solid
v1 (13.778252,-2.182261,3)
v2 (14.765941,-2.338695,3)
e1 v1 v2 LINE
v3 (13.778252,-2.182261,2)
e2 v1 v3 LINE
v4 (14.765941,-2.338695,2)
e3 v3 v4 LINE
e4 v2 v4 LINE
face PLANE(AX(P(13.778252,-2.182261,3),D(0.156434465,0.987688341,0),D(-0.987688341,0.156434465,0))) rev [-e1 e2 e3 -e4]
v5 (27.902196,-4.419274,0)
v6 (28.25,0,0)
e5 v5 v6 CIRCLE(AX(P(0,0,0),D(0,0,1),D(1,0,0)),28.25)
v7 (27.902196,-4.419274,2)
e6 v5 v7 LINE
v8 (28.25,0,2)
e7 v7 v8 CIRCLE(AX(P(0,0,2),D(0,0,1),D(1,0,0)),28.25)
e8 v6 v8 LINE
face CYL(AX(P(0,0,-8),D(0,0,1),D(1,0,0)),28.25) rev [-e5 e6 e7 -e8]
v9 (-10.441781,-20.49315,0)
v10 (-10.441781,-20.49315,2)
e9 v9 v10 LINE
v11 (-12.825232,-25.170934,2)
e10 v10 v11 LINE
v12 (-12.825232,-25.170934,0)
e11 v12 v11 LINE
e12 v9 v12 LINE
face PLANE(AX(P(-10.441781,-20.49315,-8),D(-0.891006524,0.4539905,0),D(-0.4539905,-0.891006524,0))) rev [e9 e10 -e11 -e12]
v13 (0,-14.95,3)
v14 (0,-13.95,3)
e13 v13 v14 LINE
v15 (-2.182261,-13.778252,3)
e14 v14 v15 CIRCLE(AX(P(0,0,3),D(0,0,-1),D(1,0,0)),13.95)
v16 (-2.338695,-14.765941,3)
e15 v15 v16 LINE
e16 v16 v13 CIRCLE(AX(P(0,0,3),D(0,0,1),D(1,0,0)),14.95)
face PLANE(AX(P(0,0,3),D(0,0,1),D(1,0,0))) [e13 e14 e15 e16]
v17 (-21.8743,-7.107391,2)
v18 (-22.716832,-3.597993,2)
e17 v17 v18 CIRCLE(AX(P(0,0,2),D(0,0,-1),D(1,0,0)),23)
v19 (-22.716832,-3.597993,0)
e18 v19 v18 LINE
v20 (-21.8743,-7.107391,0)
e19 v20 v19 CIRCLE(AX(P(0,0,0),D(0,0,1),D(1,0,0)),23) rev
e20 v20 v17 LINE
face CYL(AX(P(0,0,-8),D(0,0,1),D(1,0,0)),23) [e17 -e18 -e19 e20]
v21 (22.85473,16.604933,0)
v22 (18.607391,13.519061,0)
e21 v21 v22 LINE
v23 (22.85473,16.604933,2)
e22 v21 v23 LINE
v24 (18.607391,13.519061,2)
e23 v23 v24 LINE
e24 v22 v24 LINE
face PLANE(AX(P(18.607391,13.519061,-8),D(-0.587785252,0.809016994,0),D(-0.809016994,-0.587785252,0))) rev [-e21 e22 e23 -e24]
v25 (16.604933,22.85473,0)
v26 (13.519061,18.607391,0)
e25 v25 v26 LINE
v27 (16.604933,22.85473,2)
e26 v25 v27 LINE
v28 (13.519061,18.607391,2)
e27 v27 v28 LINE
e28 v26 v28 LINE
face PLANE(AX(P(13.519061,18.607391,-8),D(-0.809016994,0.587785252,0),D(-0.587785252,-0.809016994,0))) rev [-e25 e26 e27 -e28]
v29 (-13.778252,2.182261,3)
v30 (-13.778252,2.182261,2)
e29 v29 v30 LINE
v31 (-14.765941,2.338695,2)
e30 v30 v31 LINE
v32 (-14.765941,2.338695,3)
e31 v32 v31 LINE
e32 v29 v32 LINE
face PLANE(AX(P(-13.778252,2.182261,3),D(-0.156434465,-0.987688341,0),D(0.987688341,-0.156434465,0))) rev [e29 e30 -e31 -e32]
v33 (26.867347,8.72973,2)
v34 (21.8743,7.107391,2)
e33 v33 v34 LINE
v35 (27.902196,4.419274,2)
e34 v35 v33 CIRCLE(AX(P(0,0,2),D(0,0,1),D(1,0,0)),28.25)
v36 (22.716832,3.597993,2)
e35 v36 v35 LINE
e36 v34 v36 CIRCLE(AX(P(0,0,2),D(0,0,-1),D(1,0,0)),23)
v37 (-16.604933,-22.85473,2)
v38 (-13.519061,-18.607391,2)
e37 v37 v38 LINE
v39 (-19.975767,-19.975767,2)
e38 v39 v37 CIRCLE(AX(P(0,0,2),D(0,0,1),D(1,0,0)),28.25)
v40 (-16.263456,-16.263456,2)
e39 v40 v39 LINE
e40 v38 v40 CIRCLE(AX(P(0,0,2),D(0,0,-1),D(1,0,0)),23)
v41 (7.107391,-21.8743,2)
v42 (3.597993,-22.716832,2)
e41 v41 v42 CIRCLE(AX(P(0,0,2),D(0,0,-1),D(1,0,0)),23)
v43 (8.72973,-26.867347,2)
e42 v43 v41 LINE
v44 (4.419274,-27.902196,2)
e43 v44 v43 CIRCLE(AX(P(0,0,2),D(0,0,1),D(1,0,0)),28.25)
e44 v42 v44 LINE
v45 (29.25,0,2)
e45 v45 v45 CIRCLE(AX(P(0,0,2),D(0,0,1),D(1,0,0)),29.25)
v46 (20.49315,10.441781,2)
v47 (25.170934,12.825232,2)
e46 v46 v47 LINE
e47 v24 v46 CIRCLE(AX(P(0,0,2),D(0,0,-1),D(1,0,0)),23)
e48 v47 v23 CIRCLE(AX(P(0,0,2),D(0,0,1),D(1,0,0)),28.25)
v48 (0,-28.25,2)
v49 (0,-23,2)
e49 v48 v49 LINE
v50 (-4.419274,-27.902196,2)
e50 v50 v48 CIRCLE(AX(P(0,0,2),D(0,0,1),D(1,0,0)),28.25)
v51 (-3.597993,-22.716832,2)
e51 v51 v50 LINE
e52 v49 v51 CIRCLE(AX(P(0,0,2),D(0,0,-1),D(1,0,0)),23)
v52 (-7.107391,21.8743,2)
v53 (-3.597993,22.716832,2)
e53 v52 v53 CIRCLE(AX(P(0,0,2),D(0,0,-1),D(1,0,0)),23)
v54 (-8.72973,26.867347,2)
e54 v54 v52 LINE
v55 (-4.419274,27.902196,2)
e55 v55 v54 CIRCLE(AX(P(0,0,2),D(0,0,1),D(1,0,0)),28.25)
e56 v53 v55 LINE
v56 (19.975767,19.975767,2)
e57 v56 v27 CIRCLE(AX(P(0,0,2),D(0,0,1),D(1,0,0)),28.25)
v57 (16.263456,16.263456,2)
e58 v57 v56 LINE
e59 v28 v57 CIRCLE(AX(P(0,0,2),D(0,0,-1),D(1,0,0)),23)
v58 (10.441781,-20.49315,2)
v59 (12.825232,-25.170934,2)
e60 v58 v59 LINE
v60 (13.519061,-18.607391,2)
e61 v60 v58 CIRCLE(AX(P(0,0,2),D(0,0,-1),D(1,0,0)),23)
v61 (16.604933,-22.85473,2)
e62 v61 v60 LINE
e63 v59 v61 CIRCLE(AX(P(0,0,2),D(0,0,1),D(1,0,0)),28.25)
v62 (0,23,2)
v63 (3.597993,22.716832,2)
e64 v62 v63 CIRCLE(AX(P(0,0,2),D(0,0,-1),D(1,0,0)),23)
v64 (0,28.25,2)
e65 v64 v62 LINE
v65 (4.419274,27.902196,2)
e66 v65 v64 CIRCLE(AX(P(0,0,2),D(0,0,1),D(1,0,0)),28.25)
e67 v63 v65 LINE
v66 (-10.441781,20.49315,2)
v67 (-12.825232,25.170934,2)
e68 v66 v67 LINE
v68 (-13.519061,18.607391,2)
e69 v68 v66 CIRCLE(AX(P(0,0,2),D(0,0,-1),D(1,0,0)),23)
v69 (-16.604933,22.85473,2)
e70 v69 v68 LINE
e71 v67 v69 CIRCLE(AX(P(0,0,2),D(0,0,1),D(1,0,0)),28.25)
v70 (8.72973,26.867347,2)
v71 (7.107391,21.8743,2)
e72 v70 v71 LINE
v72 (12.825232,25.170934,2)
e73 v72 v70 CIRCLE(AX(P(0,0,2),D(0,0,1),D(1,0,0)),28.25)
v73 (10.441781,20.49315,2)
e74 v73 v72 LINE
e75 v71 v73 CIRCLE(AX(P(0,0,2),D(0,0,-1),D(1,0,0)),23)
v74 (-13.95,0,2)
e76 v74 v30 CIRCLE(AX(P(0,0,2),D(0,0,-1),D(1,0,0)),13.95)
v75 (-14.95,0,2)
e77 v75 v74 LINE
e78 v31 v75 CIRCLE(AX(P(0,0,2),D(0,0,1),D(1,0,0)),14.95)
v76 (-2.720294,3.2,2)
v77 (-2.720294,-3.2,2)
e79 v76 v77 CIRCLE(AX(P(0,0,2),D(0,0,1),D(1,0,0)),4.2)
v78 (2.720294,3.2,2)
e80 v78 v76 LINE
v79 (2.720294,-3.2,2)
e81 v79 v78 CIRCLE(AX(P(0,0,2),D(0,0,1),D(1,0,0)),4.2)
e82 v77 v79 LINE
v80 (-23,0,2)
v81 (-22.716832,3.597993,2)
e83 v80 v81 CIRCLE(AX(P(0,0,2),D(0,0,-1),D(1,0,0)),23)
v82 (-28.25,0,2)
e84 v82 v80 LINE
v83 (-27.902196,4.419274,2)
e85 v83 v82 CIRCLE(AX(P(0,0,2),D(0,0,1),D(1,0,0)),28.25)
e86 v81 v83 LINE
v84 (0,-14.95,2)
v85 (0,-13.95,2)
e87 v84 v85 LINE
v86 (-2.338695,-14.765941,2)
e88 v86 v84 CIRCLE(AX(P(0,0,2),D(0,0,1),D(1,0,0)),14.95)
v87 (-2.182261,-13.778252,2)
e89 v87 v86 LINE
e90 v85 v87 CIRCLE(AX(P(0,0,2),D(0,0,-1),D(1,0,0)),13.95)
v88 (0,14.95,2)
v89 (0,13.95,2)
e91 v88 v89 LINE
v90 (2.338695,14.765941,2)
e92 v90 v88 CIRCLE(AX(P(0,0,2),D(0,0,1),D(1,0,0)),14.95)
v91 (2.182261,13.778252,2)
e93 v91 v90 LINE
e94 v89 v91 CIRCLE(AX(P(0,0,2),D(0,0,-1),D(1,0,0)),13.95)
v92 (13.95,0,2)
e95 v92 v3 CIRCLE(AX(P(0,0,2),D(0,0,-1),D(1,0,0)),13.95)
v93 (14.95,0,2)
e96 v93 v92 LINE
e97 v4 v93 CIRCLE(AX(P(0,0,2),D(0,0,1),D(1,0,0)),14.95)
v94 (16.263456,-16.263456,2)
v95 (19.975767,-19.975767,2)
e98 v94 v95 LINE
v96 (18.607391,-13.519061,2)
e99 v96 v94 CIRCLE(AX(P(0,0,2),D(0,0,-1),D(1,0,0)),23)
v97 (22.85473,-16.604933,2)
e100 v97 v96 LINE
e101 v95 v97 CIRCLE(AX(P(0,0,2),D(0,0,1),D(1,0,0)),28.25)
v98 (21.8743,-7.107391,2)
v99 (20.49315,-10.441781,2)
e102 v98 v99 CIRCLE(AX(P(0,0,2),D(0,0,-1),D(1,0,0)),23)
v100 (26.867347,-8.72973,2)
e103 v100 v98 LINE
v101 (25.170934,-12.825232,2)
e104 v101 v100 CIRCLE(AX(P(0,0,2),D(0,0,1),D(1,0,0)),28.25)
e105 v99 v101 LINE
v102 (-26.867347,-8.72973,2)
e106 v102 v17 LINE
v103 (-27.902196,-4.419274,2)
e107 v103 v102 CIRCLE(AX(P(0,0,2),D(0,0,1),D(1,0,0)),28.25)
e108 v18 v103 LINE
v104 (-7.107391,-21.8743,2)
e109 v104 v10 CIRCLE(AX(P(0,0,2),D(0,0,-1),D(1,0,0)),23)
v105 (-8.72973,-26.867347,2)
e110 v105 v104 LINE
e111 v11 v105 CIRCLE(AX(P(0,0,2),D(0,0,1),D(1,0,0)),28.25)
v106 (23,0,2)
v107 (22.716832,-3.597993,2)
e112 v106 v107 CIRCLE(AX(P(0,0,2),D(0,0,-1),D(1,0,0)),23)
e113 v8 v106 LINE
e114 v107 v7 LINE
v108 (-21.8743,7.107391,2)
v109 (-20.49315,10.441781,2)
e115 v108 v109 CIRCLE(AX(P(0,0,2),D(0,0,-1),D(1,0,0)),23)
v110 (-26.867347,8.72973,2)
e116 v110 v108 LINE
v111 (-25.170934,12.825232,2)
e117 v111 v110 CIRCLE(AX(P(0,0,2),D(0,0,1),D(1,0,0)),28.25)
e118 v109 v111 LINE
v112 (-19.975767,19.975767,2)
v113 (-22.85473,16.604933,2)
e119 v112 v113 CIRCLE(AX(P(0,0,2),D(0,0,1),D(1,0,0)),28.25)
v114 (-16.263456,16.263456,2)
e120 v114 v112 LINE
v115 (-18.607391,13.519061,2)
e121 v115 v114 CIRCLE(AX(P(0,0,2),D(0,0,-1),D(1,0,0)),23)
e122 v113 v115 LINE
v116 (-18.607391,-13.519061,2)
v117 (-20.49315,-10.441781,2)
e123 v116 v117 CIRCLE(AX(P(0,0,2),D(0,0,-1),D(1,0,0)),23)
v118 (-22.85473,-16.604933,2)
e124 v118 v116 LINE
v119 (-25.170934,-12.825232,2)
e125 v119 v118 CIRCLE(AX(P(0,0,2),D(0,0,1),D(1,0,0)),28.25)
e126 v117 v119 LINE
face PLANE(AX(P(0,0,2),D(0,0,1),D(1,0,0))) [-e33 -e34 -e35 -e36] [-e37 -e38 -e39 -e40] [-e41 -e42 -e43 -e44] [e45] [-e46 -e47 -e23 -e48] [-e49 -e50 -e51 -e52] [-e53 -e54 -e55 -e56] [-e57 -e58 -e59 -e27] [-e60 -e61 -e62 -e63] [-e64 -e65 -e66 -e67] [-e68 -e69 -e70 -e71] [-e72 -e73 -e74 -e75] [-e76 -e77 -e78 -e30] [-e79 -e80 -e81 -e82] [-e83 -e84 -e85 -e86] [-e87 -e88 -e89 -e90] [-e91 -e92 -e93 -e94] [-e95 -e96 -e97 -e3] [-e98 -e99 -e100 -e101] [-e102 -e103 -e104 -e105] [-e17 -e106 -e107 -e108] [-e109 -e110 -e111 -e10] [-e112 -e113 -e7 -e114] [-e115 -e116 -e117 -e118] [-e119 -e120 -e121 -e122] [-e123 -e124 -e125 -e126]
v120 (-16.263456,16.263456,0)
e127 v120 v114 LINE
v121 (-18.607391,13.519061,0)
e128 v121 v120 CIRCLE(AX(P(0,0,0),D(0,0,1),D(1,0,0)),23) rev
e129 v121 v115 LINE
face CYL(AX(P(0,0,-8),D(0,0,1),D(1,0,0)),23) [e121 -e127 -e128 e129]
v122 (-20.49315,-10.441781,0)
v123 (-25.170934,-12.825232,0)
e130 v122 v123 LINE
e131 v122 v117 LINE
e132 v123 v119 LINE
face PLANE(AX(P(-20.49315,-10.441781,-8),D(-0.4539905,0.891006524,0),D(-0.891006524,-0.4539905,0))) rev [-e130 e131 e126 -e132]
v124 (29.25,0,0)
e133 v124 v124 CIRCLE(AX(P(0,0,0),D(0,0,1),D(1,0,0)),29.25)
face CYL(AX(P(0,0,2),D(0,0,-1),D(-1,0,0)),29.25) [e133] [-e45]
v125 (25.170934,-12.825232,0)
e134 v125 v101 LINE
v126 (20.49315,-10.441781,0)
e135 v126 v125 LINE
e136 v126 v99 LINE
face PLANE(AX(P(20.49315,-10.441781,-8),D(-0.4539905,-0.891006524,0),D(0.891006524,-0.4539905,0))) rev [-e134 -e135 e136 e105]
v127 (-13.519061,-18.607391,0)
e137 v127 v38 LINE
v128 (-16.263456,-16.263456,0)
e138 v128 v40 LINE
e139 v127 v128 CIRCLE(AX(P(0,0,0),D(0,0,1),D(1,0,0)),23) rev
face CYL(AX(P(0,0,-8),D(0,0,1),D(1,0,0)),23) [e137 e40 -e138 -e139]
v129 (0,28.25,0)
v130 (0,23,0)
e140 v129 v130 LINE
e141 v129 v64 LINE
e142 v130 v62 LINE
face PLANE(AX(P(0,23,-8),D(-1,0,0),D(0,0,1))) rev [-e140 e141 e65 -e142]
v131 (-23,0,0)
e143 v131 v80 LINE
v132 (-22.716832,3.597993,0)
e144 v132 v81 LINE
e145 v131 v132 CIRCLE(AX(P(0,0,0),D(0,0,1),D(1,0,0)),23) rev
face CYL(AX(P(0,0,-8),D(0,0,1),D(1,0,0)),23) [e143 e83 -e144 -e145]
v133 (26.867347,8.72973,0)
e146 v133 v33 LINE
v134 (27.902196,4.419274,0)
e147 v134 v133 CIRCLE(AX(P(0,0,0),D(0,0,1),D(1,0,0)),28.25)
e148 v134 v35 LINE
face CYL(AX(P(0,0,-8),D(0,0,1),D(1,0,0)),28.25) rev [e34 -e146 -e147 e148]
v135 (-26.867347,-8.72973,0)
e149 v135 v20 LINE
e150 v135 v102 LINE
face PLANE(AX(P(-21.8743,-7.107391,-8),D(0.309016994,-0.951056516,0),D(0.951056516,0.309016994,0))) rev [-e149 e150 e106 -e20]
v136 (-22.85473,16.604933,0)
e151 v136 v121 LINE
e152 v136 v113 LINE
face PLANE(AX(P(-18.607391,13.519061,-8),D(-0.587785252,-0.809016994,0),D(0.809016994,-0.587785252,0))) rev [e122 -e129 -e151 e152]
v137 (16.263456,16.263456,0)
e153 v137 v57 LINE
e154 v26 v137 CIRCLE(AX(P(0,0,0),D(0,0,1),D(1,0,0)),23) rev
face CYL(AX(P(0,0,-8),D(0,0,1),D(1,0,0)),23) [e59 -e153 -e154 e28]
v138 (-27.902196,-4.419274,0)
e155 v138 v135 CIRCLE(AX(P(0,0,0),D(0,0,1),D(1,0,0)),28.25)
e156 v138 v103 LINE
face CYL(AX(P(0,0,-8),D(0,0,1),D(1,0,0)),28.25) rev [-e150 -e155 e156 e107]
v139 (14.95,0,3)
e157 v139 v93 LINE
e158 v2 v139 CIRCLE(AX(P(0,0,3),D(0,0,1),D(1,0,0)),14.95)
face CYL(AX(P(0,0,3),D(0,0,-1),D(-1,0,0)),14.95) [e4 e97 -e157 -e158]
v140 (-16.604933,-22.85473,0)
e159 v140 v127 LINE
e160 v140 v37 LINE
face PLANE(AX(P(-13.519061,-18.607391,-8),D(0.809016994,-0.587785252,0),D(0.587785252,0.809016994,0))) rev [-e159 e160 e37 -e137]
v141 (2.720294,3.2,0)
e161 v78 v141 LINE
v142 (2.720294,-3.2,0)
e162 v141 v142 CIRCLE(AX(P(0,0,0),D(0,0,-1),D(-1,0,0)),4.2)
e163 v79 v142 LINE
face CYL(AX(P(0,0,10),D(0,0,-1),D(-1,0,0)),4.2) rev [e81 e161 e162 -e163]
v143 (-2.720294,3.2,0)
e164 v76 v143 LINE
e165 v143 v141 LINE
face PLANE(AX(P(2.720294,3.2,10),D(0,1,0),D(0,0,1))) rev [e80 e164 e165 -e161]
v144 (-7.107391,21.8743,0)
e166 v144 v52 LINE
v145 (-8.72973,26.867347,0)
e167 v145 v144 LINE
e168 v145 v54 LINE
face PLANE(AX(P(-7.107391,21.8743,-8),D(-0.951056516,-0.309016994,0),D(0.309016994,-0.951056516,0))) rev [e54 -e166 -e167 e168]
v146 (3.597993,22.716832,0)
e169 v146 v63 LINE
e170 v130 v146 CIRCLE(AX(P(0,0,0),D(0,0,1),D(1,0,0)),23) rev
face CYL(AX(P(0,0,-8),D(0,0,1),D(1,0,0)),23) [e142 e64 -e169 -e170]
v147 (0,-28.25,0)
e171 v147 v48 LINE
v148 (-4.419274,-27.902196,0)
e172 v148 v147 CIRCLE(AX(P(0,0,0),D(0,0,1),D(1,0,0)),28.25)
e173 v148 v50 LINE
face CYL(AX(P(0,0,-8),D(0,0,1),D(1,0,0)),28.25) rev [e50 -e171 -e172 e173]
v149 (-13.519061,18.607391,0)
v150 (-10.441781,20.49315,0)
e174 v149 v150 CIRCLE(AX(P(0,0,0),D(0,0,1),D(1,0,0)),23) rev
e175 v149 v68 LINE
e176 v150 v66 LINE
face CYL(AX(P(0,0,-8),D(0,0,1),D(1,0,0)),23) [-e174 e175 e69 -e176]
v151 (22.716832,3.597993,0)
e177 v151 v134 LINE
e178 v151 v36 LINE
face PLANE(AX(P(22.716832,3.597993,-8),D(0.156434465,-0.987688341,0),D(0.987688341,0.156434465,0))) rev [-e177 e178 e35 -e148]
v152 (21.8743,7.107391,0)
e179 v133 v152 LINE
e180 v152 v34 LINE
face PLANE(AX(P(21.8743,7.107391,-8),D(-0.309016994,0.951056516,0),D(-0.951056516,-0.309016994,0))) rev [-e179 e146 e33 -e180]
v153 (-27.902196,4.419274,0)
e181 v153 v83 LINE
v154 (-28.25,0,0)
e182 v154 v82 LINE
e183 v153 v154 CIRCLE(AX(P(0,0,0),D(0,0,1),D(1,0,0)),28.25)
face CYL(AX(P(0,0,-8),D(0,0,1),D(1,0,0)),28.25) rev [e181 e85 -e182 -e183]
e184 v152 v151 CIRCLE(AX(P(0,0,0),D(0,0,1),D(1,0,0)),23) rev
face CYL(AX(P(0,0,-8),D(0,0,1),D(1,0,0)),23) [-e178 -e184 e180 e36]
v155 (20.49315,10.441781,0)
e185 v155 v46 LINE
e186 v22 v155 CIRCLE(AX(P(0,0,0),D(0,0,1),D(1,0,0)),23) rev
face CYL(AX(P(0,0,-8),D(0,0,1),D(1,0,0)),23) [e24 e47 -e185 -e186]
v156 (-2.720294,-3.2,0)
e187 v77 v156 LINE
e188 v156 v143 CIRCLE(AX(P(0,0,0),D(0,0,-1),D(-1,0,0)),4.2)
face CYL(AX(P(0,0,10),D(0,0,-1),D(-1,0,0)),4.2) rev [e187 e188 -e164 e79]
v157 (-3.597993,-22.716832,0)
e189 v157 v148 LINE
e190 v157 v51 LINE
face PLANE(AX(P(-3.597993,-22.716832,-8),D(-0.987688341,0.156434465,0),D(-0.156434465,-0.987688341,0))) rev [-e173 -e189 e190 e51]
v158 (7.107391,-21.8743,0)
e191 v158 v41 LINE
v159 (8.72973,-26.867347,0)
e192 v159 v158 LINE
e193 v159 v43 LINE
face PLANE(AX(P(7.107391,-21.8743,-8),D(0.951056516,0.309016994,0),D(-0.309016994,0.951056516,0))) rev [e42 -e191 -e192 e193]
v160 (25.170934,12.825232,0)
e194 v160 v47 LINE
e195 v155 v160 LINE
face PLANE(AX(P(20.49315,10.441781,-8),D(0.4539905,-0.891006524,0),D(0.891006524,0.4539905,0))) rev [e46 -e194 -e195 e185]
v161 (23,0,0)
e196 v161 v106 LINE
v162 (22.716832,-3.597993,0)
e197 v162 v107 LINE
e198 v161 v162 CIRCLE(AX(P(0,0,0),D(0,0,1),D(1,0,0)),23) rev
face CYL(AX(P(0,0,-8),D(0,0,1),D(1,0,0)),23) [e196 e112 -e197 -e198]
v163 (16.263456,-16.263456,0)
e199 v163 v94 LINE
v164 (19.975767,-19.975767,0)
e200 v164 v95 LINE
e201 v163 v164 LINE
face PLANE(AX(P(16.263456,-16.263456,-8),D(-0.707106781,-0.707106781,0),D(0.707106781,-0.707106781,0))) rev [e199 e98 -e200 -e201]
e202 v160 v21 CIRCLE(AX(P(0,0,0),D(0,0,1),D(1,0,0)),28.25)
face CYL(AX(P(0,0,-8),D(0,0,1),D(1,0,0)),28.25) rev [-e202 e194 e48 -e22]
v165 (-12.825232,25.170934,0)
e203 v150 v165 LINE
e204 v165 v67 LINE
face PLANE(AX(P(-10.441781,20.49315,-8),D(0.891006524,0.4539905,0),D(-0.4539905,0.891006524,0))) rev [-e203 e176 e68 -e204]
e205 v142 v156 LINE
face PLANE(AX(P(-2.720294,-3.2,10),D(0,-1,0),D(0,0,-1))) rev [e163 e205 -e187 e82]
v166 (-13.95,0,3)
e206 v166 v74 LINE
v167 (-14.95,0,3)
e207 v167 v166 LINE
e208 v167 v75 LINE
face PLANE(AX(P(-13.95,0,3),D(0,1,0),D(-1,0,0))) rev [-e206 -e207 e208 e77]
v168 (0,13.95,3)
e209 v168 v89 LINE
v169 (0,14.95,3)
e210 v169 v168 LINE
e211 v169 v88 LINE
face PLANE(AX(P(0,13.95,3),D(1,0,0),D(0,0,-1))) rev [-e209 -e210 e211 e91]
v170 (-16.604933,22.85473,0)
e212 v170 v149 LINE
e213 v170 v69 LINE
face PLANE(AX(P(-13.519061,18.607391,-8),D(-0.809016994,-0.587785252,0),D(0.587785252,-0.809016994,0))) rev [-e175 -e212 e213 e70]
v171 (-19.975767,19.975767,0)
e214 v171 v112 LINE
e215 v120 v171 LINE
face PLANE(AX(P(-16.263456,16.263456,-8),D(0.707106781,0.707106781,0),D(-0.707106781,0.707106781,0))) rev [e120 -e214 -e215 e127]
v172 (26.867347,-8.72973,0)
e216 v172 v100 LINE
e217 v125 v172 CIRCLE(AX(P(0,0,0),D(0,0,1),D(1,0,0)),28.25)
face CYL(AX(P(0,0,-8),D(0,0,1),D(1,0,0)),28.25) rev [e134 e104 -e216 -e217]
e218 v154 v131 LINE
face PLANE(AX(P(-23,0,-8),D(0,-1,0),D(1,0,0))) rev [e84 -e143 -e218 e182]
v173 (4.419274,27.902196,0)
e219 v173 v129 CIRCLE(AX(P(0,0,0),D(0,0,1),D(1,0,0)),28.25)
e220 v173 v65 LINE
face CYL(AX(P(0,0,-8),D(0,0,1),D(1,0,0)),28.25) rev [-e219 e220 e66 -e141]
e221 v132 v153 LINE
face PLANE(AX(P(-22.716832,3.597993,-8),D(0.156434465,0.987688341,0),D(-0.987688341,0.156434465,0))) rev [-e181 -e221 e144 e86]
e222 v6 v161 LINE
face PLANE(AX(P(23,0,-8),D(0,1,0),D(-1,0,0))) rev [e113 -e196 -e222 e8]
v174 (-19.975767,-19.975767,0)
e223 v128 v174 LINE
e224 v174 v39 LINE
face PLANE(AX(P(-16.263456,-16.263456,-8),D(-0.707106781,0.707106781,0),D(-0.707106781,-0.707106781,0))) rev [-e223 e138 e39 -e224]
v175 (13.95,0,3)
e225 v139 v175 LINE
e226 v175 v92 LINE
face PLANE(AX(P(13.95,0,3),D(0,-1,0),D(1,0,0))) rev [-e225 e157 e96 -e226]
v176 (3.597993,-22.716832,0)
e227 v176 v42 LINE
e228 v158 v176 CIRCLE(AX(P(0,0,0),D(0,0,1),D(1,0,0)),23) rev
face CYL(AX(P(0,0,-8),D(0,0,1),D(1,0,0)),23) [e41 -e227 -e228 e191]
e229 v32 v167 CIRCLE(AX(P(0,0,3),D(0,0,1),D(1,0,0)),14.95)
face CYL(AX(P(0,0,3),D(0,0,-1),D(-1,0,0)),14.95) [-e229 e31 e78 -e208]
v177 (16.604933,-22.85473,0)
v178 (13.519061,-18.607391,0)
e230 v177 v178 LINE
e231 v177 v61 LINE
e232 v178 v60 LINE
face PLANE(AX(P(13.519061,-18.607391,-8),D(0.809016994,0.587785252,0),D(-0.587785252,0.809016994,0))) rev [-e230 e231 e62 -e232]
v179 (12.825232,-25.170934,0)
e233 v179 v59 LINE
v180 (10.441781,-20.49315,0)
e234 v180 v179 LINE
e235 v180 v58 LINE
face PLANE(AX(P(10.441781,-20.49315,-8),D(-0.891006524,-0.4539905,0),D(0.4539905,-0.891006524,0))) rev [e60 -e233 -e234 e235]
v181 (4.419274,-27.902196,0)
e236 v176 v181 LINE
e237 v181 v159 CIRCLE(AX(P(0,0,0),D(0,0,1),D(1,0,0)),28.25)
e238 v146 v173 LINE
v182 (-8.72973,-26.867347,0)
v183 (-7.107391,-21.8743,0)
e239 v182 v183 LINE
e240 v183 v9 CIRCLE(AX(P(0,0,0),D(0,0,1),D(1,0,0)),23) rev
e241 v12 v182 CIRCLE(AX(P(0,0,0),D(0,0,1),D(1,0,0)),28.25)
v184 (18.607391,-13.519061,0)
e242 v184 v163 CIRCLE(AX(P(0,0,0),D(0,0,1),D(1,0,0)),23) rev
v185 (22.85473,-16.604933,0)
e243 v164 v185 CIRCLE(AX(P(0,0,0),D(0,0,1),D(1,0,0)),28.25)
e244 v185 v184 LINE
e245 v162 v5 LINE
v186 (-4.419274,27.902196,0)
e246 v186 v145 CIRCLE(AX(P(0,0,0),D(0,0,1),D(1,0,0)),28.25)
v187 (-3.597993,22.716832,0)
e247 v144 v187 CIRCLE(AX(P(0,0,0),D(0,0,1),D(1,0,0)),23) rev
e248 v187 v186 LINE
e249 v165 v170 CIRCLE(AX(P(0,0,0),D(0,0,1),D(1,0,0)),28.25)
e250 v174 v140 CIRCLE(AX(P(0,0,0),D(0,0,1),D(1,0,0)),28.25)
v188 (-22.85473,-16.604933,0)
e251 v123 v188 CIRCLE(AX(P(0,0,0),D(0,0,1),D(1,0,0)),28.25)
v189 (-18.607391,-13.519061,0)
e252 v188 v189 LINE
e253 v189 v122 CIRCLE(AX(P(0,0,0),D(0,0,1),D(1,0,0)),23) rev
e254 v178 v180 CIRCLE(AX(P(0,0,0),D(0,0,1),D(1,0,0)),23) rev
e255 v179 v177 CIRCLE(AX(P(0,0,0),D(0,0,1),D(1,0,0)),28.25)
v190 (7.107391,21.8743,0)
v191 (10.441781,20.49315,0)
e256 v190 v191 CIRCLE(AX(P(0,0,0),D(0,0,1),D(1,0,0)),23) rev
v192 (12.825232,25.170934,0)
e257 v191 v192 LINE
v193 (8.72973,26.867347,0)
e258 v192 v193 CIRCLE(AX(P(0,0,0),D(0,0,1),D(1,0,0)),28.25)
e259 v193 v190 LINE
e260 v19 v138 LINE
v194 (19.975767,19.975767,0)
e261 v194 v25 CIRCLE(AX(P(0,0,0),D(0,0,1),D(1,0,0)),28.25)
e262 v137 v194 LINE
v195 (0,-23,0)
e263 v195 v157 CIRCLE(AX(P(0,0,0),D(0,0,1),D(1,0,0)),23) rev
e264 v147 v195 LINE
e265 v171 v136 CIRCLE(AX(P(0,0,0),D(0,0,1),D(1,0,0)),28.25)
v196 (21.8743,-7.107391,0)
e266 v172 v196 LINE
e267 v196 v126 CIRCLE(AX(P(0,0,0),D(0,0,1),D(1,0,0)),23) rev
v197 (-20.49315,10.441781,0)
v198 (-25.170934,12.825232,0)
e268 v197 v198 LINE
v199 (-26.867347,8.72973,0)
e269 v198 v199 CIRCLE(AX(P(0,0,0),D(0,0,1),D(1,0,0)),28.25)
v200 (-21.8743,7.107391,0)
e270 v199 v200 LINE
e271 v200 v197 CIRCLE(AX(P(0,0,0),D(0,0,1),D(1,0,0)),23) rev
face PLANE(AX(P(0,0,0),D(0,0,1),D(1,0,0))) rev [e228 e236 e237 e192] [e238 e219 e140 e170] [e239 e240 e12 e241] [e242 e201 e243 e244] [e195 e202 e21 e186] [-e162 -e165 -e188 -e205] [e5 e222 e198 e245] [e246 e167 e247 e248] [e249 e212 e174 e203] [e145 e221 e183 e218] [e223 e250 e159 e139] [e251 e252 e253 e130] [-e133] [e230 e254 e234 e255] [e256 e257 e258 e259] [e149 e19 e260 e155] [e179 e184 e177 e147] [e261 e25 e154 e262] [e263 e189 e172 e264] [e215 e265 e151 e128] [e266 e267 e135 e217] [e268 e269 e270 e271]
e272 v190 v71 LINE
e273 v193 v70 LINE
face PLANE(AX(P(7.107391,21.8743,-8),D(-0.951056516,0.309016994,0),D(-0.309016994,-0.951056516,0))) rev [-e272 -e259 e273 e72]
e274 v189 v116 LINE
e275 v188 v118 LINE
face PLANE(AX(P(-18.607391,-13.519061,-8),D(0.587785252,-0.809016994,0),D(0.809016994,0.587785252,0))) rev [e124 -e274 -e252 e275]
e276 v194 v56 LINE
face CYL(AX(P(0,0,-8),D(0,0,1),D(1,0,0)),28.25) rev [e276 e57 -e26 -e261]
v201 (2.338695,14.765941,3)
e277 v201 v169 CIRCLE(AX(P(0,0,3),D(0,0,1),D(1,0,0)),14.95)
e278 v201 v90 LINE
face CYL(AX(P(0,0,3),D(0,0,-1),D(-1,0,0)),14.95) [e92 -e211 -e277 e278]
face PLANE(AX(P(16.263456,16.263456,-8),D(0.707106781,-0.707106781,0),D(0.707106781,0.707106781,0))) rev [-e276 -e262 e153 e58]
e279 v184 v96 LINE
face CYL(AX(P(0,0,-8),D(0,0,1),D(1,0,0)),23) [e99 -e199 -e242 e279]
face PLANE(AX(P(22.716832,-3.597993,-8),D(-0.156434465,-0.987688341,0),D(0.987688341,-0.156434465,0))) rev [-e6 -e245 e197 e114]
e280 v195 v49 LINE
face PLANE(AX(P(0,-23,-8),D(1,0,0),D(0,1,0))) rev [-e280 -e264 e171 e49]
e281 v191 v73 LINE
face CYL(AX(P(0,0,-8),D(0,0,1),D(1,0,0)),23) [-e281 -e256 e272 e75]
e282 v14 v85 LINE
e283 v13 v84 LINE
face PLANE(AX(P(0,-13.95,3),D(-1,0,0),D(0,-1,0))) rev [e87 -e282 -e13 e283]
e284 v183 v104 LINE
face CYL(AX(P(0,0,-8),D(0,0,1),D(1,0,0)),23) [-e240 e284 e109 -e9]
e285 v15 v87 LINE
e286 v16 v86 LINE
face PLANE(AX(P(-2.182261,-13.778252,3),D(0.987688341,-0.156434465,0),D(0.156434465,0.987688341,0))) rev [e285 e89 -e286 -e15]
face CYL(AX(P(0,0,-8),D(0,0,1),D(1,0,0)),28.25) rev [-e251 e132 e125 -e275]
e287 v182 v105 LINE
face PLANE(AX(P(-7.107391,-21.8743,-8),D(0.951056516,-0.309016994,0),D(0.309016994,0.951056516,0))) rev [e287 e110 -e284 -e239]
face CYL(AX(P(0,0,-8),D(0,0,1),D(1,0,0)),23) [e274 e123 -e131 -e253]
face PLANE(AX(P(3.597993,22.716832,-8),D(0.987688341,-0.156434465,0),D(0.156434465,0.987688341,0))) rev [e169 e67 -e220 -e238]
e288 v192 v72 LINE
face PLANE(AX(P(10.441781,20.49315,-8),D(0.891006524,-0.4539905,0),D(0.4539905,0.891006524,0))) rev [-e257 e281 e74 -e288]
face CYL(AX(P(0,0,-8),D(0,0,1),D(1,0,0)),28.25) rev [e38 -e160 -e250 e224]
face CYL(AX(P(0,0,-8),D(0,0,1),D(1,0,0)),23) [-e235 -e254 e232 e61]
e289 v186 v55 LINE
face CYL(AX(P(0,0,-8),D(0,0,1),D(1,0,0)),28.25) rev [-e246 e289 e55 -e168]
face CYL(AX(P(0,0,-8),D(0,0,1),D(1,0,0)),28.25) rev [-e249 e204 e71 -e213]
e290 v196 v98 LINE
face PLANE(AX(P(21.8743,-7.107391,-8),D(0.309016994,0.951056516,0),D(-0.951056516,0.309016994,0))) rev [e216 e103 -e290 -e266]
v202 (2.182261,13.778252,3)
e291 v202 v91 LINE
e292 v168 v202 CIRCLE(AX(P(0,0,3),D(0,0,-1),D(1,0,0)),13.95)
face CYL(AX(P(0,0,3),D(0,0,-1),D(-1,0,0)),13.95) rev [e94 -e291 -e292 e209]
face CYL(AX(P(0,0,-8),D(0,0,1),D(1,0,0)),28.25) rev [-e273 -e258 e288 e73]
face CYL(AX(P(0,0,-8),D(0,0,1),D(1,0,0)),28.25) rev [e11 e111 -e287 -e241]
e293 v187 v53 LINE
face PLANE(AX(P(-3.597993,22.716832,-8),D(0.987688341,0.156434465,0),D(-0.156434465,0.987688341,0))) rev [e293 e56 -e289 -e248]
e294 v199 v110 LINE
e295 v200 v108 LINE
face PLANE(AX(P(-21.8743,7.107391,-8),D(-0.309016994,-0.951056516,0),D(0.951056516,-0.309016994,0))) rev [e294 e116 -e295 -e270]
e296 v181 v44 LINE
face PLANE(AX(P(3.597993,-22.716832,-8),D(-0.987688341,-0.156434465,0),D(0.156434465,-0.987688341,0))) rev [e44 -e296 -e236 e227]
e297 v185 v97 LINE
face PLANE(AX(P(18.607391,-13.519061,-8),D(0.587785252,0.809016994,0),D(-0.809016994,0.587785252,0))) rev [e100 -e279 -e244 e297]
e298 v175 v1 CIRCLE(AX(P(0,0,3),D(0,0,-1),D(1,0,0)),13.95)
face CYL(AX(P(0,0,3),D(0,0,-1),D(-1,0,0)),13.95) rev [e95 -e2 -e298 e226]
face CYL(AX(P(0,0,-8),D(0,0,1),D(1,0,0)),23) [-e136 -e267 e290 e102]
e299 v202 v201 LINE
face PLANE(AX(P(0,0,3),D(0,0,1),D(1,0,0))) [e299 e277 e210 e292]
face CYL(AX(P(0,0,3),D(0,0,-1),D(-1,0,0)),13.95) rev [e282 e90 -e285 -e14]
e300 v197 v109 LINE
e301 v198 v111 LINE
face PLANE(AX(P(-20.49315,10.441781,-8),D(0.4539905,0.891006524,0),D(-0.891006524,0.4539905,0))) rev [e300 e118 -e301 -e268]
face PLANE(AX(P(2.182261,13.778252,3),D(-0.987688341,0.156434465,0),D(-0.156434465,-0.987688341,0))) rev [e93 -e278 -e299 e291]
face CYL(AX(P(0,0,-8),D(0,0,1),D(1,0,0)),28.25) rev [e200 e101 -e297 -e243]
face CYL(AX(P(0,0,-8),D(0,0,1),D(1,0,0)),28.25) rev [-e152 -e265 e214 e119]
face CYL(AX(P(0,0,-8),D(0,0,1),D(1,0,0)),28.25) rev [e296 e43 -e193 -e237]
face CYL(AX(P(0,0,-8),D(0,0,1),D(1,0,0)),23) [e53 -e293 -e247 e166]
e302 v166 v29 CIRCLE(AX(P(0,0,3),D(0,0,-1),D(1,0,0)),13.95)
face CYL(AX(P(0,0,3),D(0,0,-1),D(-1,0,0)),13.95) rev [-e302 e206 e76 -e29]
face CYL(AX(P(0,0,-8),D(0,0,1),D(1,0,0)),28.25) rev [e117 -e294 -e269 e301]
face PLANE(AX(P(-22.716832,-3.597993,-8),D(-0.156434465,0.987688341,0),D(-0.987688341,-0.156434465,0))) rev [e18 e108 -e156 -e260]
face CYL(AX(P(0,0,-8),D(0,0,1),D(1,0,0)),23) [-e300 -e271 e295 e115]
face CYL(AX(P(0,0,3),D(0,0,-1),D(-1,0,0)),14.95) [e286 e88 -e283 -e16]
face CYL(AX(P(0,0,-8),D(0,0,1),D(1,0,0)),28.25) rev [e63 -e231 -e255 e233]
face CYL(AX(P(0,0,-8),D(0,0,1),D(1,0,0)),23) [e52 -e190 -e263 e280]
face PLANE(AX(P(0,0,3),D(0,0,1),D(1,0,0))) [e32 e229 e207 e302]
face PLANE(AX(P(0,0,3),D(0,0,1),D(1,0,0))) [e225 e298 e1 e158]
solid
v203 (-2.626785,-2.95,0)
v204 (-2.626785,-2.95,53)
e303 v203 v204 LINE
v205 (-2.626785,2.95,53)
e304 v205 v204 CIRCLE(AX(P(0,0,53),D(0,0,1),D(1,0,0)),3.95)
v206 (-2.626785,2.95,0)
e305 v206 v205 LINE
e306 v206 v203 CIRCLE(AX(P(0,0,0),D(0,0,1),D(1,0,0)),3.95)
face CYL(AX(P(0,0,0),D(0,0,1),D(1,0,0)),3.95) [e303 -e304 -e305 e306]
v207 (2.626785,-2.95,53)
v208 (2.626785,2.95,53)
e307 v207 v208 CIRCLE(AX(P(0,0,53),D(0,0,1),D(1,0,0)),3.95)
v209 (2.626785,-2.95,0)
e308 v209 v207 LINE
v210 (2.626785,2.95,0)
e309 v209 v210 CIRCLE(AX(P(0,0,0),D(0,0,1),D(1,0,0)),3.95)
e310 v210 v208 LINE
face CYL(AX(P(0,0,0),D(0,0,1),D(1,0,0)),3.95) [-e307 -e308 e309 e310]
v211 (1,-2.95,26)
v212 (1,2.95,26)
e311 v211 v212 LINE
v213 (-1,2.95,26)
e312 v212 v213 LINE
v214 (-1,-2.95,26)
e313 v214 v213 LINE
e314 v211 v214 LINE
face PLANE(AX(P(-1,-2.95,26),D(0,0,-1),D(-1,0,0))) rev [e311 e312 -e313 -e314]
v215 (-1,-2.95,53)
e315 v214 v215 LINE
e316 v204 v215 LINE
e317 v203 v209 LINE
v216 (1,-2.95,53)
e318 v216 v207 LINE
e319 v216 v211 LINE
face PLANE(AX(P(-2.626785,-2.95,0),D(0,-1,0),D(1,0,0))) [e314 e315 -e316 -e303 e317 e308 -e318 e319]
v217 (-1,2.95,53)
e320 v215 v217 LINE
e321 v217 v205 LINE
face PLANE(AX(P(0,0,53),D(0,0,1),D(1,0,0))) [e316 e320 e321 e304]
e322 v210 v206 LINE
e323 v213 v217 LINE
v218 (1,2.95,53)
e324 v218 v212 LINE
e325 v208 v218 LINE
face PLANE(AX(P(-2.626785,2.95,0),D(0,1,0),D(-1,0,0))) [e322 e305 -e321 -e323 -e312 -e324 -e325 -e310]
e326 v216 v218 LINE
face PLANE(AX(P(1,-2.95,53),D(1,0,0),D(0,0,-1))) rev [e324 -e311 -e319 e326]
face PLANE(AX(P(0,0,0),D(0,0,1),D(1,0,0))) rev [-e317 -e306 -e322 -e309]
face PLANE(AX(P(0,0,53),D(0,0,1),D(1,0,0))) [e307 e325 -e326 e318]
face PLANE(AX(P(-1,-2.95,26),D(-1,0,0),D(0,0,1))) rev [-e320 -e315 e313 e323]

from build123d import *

# Parameters (mm, degrees)
SKETCH1_R             = 29.25
BOSS_EXTRUDE1_DEPTH   = 2
BOSS_EXTRUDE2_DEPTH   = 1
AXEL_START            = 17.516826032
AXEL_DEPTH            = 53
AXEL_2_OUTLINE_W      = 5.9
AXEL_2_OUTLINE_H      = 2
AXEL_2_DEPTH          = 26
BODY_MOVE_COPY2_ANGLE = 90
CUT_EXTRUDE1_DEPTH    = 10
CUT_EXTRUDE2_DEPTH    = 10


with BuildPart() as part:
    # Sketch1 → Boss-Extrude1 (new body)
    with BuildSketch(Plane.XY):
        Circle(SKETCH1_R)
    extrude(amount=BOSS_EXTRUDE1_DEPTH)

    # Sketch2 → Boss-Extrude2 (add)
    with BuildSketch(Plane.XY.offset(2)):
        with BuildLine():
            Line((0, 13.95), (0, 14.95))
            ThreePointArc((0, 14.95), (1.172963481, 14.903914139), (2.338695252, 14.765940692))
            Line((2.338695252, 14.765940692), (2.182260787, 13.778252351))
            ThreePointArc((2.182260787, 13.778252351), (1.094504385, 13.906996806), (0, 13.95))
        make_face()
        with BuildLine():
            Line((13.95, 0), (14.95, 0))
            ThreePointArc((14.95, 0), (14.903914139, -1.172963481), (14.765940692, -2.338695252))
            Line((14.765940692, -2.338695252), (13.778252351, -2.182260787))
            ThreePointArc((13.778252351, -2.182260787), (13.906996806, -1.094504385), (13.95, 0))
        make_face()
        with BuildLine():
            Line((0, -13.95), (0, -14.95))
            ThreePointArc((0, -14.95), (-1.172963481, -14.903914139), (-2.338695252, -14.765940692))
            Line((-2.338695252, -14.765940692), (-2.182260787, -13.778252351))
            ThreePointArc((-2.182260787, -13.778252351), (-1.094504385, -13.906996806), (0, -13.95))
        make_face()
        with BuildLine():
            Line((-13.95, 0), (-14.95, 0))
            ThreePointArc((-14.95, 0), (-14.903914139, 1.172963481), (-14.765940692, 2.338695252))
            Line((-14.765940692, 2.338695252), (-13.778252351, 2.182260787))
            ThreePointArc((-13.778252351, 2.182260787), (-13.906996806, 1.094504385), (-13.95, 0))
        make_face()
    extrude(amount=BOSS_EXTRUDE2_DEPTH)

    # Sketch3 → Cut-Extrude1 (cut)
    with BuildSketch(Plane(origin=(0, 0, 0), x_dir=(-1, 0, 0), z_dir=(0, 0, -1))):
        with BuildLine():
            Line((-2.720294102, 3.2), (2.720294102, 3.2))
            ThreePointArc((2.720294102, 3.2), (4.2, 0), (2.720294102, -3.2))
            Line((2.720294102, -3.2), (-2.720294102, -3.2))
            ThreePointArc((-2.720294102, -3.2), (-4.2, 0), (-2.720294102, 3.2))
        make_face()
    extrude(amount=-CUT_EXTRUDE1_DEPTH, mode=Mode.SUBTRACT)

    # Sketch4 → Cut-Extrude2 (cut)
    with BuildSketch(Plane.XY.offset(2)):
        with BuildLine():
            Line((0, 23), (0, 28.25))
            ThreePointArc((0, 28.25), (2.216469454, 28.162914678), (4.419273637, 27.902195622))
            Line((4.419273637, 27.902195622), (3.597992696, 22.716831834))
            ThreePointArc((3.597992696, 22.716831834), (1.804559202, 22.929098676), (0, 23))
        make_face()
        with BuildLine():
            Line((10.441781494, 20.493150056), (12.825231618, 25.170934308))
            ThreePointArc((12.825231618, 25.170934308), (10.810806964, 26.099596793), (8.729730091, 26.867346585))
            Line((8.729730091, 26.867346585), (7.107390871, 21.874299875))
            ThreePointArc((7.107390871, 21.874299875), (8.801718944, 21.249229248), (10.441781494, 20.493150056))
        make_face()
        with BuildLine():
            Line((16.263455967, 16.263455967), (19.975766569, 19.975766569))
            ThreePointArc((19.975766569, 19.975766569), (18.346907365, 21.481468528), (16.604933377, 22.854730091))
            Line((16.604933377, 22.854730091), (13.519060803, 18.607390871))
            ThreePointArc((13.519060803, 18.607390871), (14.937305112, 17.489337209), (16.263455967, 16.263455967))
        make_face()
        with BuildLine():
            Line((20.493150056, 10.441781494), (25.170934308, 12.825231618))
            ThreePointArc((25.170934308, 12.825231618), (24.087084643, 14.760584453), (22.854730091, 16.604933377))
            Line((22.854730091, 16.604933377), (18.607390871, 13.519060803))
            ThreePointArc((18.607390871, 13.519060803), (19.61072378, 12.017466988), (20.493150056, 10.441781494))
        make_face()
        with BuildLine():
            Line((22.716831834, 3.597992696), (27.902195622, 4.419273637))
            ThreePointArc((27.902195622, 4.419273637), (27.469450251, 6.594831529), (26.867346585, 8.729730091))
            Line((26.867346585, 8.729730091), (21.874299875, 7.107390871))
            ThreePointArc((21.874299875, 7.107390871), (22.364508169, 5.369243369), (22.716831834, 3.597992696))
        make_face()
        with BuildLine():
            Line((22.716831834, -3.597992696), (27.902195622, -4.419273637))
            ThreePointArc((27.902195622, -4.419273637), (28.162914678, -2.216469454), (28.25, 0))
            Line((28.25, 0), (23, 0))
            ThreePointArc((23, 0), (22.929098676, -1.804559202), (22.716831834, -3.597992696))
        make_face()
        with BuildLine():
            Line((20.493150056, -10.441781494), (25.170934308, -12.825231618))
            ThreePointArc((25.170934308, -12.825231618), (26.099596793, -10.810806964), (26.867346585, -8.729730091))
            Line((26.867346585, -8.729730091), (21.874299875, -7.107390871))
            ThreePointArc((21.874299875, -7.107390871), (21.249229248, -8.801718944), (20.493150056, -10.441781494))
        make_face()
        with BuildLine():
            Line((16.263455967, -16.263455967), (19.975766569, -19.975766569))
            ThreePointArc((19.975766569, -19.975766569), (21.481468528, -18.346907365), (22.854730091, -16.604933377))
            Line((22.854730091, -16.604933377), (18.607390871, -13.519060803))
            ThreePointArc((18.607390871, -13.519060803), (17.489337209, -14.937305112), (16.263455967, -16.263455967))
        make_face()
        with BuildLine():
            Line((10.441781494, -20.493150056), (12.825231618, -25.170934308))
            ThreePointArc((12.825231618, -25.170934308), (14.760584453, -24.087084643), (16.604933377, -22.854730091))
            Line((16.604933377, -22.854730091), (13.519060803, -18.607390871))
            ThreePointArc((13.519060803, -18.607390871), (12.017466988, -19.61072378), (10.441781494, -20.493150056))
        make_face()
        with BuildLine():
            Line((3.597992696, -22.716831834), (4.419273637, -27.902195622))
            ThreePointArc((4.419273637, -27.902195622), (6.594831529, -27.469450251), (8.729730091, -26.867346585))
            Line((8.729730091, -26.867346585), (7.107390871, -21.874299875))
            ThreePointArc((7.107390871, -21.874299875), (5.369243369, -22.364508169), (3.597992696, -22.716831834))
        make_face()
        with BuildLine():
            Line((-3.597992696, -22.716831834), (-4.419273637, -27.902195622))
            ThreePointArc((-4.419273637, -27.902195622), (-2.216469454, -28.162914678), (0, -28.25))
            Line((0, -28.25), (0, -23))
            ThreePointArc((0, -23), (-1.804559202, -22.929098676), (-3.597992696, -22.716831834))
        make_face()
        with BuildLine():
            Line((-10.441781494, -20.493150056), (-12.825231618, -25.170934308))
            ThreePointArc((-12.825231618, -25.170934308), (-10.810806964, -26.099596793), (-8.729730091, -26.867346585))
            Line((-8.729730091, -26.867346585), (-7.107390871, -21.874299875))
            ThreePointArc((-7.107390871, -21.874299875), (-8.801718944, -21.249229248), (-10.441781494, -20.493150056))
        make_face()
        with BuildLine():
            Line((-16.263455967, -16.263455967), (-19.975766569, -19.975766569))
            ThreePointArc((-19.975766569, -19.975766569), (-18.346907365, -21.481468528), (-16.604933377, -22.854730091))
            Line((-16.604933377, -22.854730091), (-13.519060803, -18.607390871))
            ThreePointArc((-13.519060803, -18.607390871), (-14.937305112, -17.489337209), (-16.263455967, -16.263455967))
        make_face()
        with BuildLine():
            Line((-20.493150056, -10.441781494), (-25.170934308, -12.825231618))
            ThreePointArc((-25.170934308, -12.825231618), (-24.087084643, -14.760584453), (-22.854730091, -16.604933377))
            Line((-22.854730091, -16.604933377), (-18.607390871, -13.519060803))
            ThreePointArc((-18.607390871, -13.519060803), (-19.61072378, -12.017466988), (-20.493150056, -10.441781494))
        make_face()
        with BuildLine():
            Line((-22.716831834, -3.597992696), (-27.902195622, -4.419273637))
            ThreePointArc((-27.902195622, -4.419273637), (-27.469450251, -6.594831529), (-26.867346585, -8.729730091))
            Line((-26.867346585, -8.729730091), (-21.874299875, -7.107390871))
            ThreePointArc((-21.874299875, -7.107390871), (-22.364508169, -5.369243369), (-22.716831834, -3.597992696))
        make_face()
        with BuildLine():
            Line((-22.716831834, 3.597992696), (-27.902195622, 4.419273637))
            ThreePointArc((-27.902195622, 4.419273637), (-28.162914678, 2.216469454), (-28.25, 0))
            Line((-28.25, 0), (-23, 0))
            ThreePointArc((-23, 0), (-22.929098676, 1.804559202), (-22.716831834, 3.597992696))
        make_face()
        with BuildLine():
            Line((-20.493150056, 10.441781494), (-25.170934308, 12.825231618))
            ThreePointArc((-25.170934308, 12.825231618), (-26.099596793, 10.810806964), (-26.867346585, 8.729730091))
            Line((-26.867346585, 8.729730091), (-21.874299875, 7.107390871))
            ThreePointArc((-21.874299875, 7.107390871), (-21.249229248, 8.801718944), (-20.493150056, 10.441781494))
        make_face()
        with BuildLine():
            Line((-16.263455967, 16.263455967), (-19.975766569, 19.975766569))
            ThreePointArc((-19.975766569, 19.975766569), (-21.481468528, 18.346907365), (-22.854730091, 16.604933377))
            Line((-22.854730091, 16.604933377), (-18.607390871, 13.519060803))
            ThreePointArc((-18.607390871, 13.519060803), (-17.489337209, 14.937305112), (-16.263455967, 16.263455967))
        make_face()
        with BuildLine():
            Line((-10.441781494, 20.493150056), (-12.825231618, 25.170934308))
            ThreePointArc((-12.825231618, 25.170934308), (-14.760584453, 24.087084643), (-16.604933377, 22.854730091))
            Line((-16.604933377, 22.854730091), (-13.519060803, 18.607390871))
            ThreePointArc((-13.519060803, 18.607390871), (-12.017466988, 19.61072378), (-10.441781494, 20.493150056))
        make_face()
        with BuildLine():
            Line((-3.597992696, 22.716831834), (-4.419273637, 27.902195622))
            ThreePointArc((-4.419273637, 27.902195622), (-6.594831529, 27.469450251), (-8.729730091, 26.867346585))
            Line((-8.729730091, 26.867346585), (-7.107390871, 21.874299875))
            ThreePointArc((-7.107390871, 21.874299875), (-5.369243369, 22.364508169), (-3.597992696, 22.716831834))
        make_face()
    extrude(amount=-CUT_EXTRUDE2_DEPTH, mode=Mode.SUBTRACT)


with BuildPart() as body_2:
    # Axel: read off the stored shape, not the designer's step
    # Axel outline → Axel (new body)
    with BuildSketch(Plane.YZ.offset(AXEL_START)):
        with BuildLine():
            Line((1.513004267, 20.746673909), (1.513004267, 22.373459016))
            ThreePointArc((1.513004267, 22.373459016), (-1.436995733, 23.696673909), (-4.386995733, 22.373459016))
            Line((-4.386995733, 22.373459016), (-4.386995733, 20.746673909))
            Line((-4.386995733, 20.746673909), (1.513004267, 20.746673909))
        make_face()
        with BuildLine():
            Line((1.513004267, 17.119888802), (1.513004267, 18.746673909))
            Line((1.513004267, 18.746673909), (-4.386995733, 18.746673909))
            Line((-4.386995733, 18.746673909), (-4.386995733, 17.119888802))
            ThreePointArc((-4.386995733, 17.119888802), (-1.436995733, 15.796673909), (1.513004267, 17.119888802))
        make_face()
    extrude(amount=AXEL_DEPTH)

    # Axel 2 outline → Axel 2 (add)
    with BuildSketch(Plane.YZ.offset(AXEL_START)):
        with Locations((-1.436995733, 19.746673909)):
            Rectangle(AXEL_2_OUTLINE_W, AXEL_2_OUTLINE_H)
    extrude(amount=AXEL_2_DEPTH)


with BuildPart() as body_2_1:
    # Body-Move/Copy2: read off the stored shape, not the designer's step
    # Body-Move/Copy2: moved
    add(body_2.part.moved(Location((-17.516826, 1.4369957, -19.7466739))).rotate(Axis((0, 0, 0), (0, -1, 0)), BODY_MOVE_COPY2_ANGLE))


solid = Compound([part.part, body_2_1.part])
